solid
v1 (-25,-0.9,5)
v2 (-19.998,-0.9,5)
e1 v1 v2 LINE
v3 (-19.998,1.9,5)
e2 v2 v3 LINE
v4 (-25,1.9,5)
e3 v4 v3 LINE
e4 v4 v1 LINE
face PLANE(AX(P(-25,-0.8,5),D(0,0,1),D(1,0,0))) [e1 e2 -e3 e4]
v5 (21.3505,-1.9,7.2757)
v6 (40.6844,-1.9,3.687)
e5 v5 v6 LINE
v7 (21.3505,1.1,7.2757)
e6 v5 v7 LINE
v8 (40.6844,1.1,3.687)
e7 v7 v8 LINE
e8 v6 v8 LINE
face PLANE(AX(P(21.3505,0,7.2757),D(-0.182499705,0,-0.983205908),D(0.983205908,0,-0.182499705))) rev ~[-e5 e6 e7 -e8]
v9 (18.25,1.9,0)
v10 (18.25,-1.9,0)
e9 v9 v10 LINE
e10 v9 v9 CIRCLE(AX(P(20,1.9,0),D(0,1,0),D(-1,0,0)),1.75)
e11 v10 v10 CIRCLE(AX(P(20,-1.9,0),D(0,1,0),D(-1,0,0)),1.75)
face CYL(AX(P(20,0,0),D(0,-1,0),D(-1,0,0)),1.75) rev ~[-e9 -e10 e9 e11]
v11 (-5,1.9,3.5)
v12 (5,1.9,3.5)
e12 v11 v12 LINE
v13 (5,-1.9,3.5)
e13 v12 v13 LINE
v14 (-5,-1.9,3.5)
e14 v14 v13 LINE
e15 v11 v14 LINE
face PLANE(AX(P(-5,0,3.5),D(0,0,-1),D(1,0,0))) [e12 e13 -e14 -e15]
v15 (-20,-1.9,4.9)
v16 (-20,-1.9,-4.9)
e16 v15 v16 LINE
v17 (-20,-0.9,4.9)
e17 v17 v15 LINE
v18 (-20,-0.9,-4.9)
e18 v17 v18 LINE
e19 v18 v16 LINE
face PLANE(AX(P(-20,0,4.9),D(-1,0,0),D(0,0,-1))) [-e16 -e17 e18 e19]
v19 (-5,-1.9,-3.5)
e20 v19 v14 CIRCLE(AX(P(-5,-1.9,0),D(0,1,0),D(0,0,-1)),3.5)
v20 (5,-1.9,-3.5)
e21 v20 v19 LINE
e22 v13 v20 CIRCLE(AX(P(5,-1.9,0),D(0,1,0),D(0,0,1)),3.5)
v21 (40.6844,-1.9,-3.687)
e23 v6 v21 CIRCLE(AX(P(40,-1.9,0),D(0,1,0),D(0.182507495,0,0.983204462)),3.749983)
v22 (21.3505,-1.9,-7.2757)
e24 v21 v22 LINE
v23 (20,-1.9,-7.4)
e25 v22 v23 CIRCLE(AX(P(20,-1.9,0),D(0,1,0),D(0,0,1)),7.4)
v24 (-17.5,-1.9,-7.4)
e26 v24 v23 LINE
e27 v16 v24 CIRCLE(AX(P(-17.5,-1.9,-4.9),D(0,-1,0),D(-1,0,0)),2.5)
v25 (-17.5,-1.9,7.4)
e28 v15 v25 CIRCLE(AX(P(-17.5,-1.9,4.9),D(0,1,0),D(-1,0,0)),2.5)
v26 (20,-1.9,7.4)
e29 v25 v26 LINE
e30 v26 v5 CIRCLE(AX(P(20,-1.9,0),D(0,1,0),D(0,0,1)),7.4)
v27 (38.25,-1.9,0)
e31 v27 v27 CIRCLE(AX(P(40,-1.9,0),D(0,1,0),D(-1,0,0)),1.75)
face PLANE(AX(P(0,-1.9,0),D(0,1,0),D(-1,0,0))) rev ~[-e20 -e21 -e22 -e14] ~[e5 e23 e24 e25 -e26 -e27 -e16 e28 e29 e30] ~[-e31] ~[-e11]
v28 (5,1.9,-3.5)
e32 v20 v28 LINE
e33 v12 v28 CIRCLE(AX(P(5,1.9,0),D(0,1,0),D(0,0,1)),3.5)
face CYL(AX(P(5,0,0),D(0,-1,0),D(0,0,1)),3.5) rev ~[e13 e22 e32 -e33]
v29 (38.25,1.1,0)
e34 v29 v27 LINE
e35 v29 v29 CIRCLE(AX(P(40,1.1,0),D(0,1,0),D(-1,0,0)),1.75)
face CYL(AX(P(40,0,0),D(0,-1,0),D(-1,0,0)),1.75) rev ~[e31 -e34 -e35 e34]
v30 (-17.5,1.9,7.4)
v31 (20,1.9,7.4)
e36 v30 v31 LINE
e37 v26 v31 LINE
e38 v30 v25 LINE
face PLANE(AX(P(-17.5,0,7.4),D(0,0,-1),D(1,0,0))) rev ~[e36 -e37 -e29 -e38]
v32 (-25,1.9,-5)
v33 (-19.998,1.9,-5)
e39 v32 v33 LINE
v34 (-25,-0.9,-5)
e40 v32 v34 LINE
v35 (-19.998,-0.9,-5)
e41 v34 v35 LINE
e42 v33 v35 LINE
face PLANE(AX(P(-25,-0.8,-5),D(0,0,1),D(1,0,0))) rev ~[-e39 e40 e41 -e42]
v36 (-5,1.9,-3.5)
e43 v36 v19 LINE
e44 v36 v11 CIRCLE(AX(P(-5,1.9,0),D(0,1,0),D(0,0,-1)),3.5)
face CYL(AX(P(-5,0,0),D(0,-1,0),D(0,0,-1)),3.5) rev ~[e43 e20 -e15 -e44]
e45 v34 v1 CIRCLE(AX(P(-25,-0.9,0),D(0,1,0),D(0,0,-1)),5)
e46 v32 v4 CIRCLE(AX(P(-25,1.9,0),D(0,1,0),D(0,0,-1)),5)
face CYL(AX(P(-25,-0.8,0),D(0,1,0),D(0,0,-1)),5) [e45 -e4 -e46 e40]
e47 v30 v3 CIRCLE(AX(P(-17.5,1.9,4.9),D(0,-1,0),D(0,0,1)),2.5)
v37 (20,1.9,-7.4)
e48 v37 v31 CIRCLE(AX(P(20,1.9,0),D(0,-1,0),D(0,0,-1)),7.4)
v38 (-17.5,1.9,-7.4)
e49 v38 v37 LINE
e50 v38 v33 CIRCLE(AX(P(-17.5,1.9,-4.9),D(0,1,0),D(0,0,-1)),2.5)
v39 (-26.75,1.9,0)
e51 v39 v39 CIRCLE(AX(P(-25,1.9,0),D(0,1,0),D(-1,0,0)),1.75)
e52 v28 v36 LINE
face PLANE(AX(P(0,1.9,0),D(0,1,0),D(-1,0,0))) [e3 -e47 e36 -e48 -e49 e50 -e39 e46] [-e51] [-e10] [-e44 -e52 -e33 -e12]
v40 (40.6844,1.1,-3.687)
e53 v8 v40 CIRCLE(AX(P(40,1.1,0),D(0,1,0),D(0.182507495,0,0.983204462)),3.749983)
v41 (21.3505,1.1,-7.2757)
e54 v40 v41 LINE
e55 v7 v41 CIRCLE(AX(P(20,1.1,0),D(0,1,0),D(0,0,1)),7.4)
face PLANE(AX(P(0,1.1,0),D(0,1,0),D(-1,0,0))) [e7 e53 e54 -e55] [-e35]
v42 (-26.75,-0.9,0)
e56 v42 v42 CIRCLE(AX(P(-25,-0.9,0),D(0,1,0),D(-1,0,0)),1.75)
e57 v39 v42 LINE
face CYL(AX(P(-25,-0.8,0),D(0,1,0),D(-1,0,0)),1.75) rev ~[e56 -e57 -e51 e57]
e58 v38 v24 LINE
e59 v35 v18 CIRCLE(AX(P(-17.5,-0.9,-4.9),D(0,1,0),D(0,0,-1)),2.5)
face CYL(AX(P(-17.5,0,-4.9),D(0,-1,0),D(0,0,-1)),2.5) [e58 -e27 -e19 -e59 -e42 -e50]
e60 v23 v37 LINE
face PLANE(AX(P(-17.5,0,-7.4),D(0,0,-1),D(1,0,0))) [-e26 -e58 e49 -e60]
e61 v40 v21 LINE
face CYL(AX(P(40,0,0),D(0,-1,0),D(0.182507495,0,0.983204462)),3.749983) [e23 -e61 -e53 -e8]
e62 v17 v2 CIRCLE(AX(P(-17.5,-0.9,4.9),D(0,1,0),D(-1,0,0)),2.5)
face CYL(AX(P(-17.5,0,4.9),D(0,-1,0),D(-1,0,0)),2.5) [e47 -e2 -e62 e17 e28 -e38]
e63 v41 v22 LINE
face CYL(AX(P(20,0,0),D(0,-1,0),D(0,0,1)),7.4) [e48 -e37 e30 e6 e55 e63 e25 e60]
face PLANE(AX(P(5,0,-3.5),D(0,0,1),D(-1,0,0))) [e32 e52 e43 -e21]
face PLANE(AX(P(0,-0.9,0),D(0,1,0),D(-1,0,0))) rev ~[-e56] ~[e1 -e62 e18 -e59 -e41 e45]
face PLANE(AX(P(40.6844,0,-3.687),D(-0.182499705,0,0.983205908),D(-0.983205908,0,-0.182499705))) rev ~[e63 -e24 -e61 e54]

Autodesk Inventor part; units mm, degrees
ref_plane "YZ Plane" through (0, 0, 0) normal (1, 0, 0) x (0, 1, 0)
ref_plane "XZ Plane" through (0, 0, 0) normal (0, 1, 0) x (-1, 0, 0)
ref_plane "XY Plane" through (0, 0, 0) normal (0, 0, 1) x (1, 0, 0)
sketch "Sketch1" plane through (0, 0, 0) normal (0, 1, 0) x (-1, 0, 0)
  line L0 (-5, 0) -> (5, 0) construction
  line L1 (-5, -3.5) -> (5, -3.5)
  line L2 (5, 3.5) -> (-5, 3.5)
  arc A0 (-5, 3.5) -> (-5, -3.5) centre (-5, 0) ccw
  arc A1 (5, -3.5) -> (5, 3.5) centre (5, 0) ccw
  circle A2 centre (-20, 0) radius 1.75
  arc A3 (-20, 7.4) -> (-20, -7.4) centre (-20, 0) ccw
  line L3 (17.5, -7.4) -> (-20, -7.4)
  line L4 (17.5, 7.4) -> (-20, 7.4)
  line L5 (20, 4.9) -> (20, -4.9)
  arc A4 (25, -5) -> (25, 5) centre (25, 0) ccw
  circle A5 centre (25, 0) radius 1.75
  line L6 (25, 5) -> (19.998, 5)
  line L7 (25, -5) -> (19.998, -5)
  arc A6 (20, 4.9) -> (17.5, 7.4) centre (17.5, 4.9) ccw
  arc A7 (17.5, -7.4) -> (20, -4.9) centre (17.5, -4.9) ccw
  circle A8 centre (-40, 0) radius 1.75
  circle A9 centre (-40, 0) radius 3.75
  line L8 (-40, 3.75) -> (-21.3747, 7.2712)
  line L9 (-40, -3.75) -> (-21.3747, -7.2712)
  point P0 (0, 0)
  dimension "d3" = 10
  dimension "d4" = 3.5
  dimension "d5" = 3.5
  dimension "d6" = 14.8
  dimension "d10" = 10
  dimension "d11" = 5
  dimension "d12" = 3.5
  dimension "d13" = 2.5
  dimension "d51" = 15
  dimension "d52" = 40
  dimension "d53" = 3.5
  dimension "d54" = 7.5
  dimension "d55" = 20
extrude "Extrusion1" add sketch "Sketch1" along normal mid plane 3.8 contours L4 A6 L5 A7 L3 A3
sketch "Sketch4" plane through (0, 0, 0) normal (0, 1, 0) x (-1, 0, 0)
  line L0 (-5, 0) -> (5, 0) construction
  line L1 (-5, -3.5) -> (5, -3.5)
  line L2 (5, 3.5) -> (-5, 3.5)
  arc A0 (-5, 3.5) -> (-5, -3.5) centre (-5, 0) ccw
  arc A1 (5, -3.5) -> (5, 3.5) centre (5, 0) ccw
  circle A2 centre (-20, 0) radius 1.75
  arc A3 (-20, 7.4) -> (-20, -7.4) centre (-20, 0) ccw
  line L3 (17.5, -7.4) -> (-20, -7.4)
  line L4 (17.5, 7.4) -> (-20, 7.4)
  line L5 (20, 4.9) -> (20, -4.9)
  arc A4 (25, -5) -> (25, 5) centre (25, 0) ccw
  circle A5 centre (25, 0) radius 1.75
  line L6 (25, 5) -> (19.998, 5)
  line L7 (25, -5) -> (19.998, -5)
  arc A6 (20, 4.9) -> (17.5, 7.4) centre (17.5, 4.9) ccw
  arc A7 (17.5, -7.4) -> (20, -4.9) centre (17.5, -4.9) ccw
  circle A8 centre (-40, 0) radius 1.75
  arc A9 (-40.6844, 3.687) -> (-40.6844, -3.687) centre (-40, 0) ccw
  line L8 (-21.3505, 7.2757) -> (-40.6844, 3.687)
  arc A10 (-20, 7.4) -> (-20, -7.4) centre (-20, 0) ccw projected
  line L9 (-48.2908, 0) -> (-20.7624, 0) construction
  line L10 (-40.6844, -3.687) -> (-21.3505, -7.2757)
  point P0 (0, 0)
  point P1 (0, 0)
  dimension "d56" = 10
  dimension "d57" = 3.5
  dimension "d58" = 3.5
  dimension "d59" = 14.8
  dimension "d60" = 10
  dimension "d61" = 5
  dimension "d62" = 3.5
  dimension "d63" = 2.5
  dimension "d64" = 15
  dimension "d65" = 40
  dimension "d66" = 3.5
  dimension "d67" = 7.5
  dimension "d68" = 20
extrude "Extrusion4" add sketch "Sketch4" along normal blind 1.1 and the other way blind 1.9 contours A3 L10 A9 L8
sketch "Sketch5" plane through (0, 0, 0) normal (0, 1, 0) x (-1, 0, 0)
  line L0 (-5, 0) -> (5, 0) construction
  line L1 (-5, -3.5) -> (5, -3.5)
  line L2 (5, 3.5) -> (-5, 3.5)
  arc A0 (-5, 3.5) -> (-5, -3.5) centre (-5, 0) ccw
  arc A1 (5, -3.5) -> (5, 3.5) centre (5, 0) ccw
  circle A2 centre (-20, 0) radius 1.75
  arc A3 (-20, 7.4) -> (-20, -7.4) centre (-20, 0) ccw
  line L3 (17.5, -7.4) -> (-20, -7.4)
  line L4 (17.5, 7.4) -> (-20, 7.4)
  line L5 (20, 4.9) -> (20, -4.9)
  arc A4 (25, -5) -> (25, 5) centre (25, 0) ccw
  circle A5 centre (25, 0) radius 1.75
  line L6 (25, 5) -> (19.998, 5)
  line L7 (25, -5) -> (19.998, -5)
  arc A6 (20, 4.9) -> (17.5, 7.4) centre (17.5, 4.9) ccw
  arc A7 (17.5, -7.4) -> (20, -4.9) centre (17.5, -4.9) ccw
  circle A8 centre (-40, 0) radius 1.75
  circle A9 centre (-40, 0) radius 3.75
  line L8 (-40, 3.75) -> (-21.3747, 7.2712)
  line L9 (-40, -3.75) -> (-21.3747, -7.2712)
  point P0 (0, 0)
  point P1 (0, 0)
  dimension "d73" = 10
  dimension "d74" = 3.5
  dimension "d75" = 3.5
  dimension "d76" = 14.8
  dimension "d77" = 10
  dimension "d78" = 5
  dimension "d79" = 3.5
  dimension "d80" = 2.5
  dimension "d81" = 15
  dimension "d82" = 40
  dimension "d83" = 3.5
  dimension "d84" = 7.5
  dimension "d85" = 20
extrude "Extrusion5" add sketch "Sketch5" along normal blind 1.9 and the other way blind 0.8 contours L6 A4 L7 A7 L5 A6
move faces "Move1" translate (0, -0.1, 0) faces at (-21.0833, -0.8, 0)
